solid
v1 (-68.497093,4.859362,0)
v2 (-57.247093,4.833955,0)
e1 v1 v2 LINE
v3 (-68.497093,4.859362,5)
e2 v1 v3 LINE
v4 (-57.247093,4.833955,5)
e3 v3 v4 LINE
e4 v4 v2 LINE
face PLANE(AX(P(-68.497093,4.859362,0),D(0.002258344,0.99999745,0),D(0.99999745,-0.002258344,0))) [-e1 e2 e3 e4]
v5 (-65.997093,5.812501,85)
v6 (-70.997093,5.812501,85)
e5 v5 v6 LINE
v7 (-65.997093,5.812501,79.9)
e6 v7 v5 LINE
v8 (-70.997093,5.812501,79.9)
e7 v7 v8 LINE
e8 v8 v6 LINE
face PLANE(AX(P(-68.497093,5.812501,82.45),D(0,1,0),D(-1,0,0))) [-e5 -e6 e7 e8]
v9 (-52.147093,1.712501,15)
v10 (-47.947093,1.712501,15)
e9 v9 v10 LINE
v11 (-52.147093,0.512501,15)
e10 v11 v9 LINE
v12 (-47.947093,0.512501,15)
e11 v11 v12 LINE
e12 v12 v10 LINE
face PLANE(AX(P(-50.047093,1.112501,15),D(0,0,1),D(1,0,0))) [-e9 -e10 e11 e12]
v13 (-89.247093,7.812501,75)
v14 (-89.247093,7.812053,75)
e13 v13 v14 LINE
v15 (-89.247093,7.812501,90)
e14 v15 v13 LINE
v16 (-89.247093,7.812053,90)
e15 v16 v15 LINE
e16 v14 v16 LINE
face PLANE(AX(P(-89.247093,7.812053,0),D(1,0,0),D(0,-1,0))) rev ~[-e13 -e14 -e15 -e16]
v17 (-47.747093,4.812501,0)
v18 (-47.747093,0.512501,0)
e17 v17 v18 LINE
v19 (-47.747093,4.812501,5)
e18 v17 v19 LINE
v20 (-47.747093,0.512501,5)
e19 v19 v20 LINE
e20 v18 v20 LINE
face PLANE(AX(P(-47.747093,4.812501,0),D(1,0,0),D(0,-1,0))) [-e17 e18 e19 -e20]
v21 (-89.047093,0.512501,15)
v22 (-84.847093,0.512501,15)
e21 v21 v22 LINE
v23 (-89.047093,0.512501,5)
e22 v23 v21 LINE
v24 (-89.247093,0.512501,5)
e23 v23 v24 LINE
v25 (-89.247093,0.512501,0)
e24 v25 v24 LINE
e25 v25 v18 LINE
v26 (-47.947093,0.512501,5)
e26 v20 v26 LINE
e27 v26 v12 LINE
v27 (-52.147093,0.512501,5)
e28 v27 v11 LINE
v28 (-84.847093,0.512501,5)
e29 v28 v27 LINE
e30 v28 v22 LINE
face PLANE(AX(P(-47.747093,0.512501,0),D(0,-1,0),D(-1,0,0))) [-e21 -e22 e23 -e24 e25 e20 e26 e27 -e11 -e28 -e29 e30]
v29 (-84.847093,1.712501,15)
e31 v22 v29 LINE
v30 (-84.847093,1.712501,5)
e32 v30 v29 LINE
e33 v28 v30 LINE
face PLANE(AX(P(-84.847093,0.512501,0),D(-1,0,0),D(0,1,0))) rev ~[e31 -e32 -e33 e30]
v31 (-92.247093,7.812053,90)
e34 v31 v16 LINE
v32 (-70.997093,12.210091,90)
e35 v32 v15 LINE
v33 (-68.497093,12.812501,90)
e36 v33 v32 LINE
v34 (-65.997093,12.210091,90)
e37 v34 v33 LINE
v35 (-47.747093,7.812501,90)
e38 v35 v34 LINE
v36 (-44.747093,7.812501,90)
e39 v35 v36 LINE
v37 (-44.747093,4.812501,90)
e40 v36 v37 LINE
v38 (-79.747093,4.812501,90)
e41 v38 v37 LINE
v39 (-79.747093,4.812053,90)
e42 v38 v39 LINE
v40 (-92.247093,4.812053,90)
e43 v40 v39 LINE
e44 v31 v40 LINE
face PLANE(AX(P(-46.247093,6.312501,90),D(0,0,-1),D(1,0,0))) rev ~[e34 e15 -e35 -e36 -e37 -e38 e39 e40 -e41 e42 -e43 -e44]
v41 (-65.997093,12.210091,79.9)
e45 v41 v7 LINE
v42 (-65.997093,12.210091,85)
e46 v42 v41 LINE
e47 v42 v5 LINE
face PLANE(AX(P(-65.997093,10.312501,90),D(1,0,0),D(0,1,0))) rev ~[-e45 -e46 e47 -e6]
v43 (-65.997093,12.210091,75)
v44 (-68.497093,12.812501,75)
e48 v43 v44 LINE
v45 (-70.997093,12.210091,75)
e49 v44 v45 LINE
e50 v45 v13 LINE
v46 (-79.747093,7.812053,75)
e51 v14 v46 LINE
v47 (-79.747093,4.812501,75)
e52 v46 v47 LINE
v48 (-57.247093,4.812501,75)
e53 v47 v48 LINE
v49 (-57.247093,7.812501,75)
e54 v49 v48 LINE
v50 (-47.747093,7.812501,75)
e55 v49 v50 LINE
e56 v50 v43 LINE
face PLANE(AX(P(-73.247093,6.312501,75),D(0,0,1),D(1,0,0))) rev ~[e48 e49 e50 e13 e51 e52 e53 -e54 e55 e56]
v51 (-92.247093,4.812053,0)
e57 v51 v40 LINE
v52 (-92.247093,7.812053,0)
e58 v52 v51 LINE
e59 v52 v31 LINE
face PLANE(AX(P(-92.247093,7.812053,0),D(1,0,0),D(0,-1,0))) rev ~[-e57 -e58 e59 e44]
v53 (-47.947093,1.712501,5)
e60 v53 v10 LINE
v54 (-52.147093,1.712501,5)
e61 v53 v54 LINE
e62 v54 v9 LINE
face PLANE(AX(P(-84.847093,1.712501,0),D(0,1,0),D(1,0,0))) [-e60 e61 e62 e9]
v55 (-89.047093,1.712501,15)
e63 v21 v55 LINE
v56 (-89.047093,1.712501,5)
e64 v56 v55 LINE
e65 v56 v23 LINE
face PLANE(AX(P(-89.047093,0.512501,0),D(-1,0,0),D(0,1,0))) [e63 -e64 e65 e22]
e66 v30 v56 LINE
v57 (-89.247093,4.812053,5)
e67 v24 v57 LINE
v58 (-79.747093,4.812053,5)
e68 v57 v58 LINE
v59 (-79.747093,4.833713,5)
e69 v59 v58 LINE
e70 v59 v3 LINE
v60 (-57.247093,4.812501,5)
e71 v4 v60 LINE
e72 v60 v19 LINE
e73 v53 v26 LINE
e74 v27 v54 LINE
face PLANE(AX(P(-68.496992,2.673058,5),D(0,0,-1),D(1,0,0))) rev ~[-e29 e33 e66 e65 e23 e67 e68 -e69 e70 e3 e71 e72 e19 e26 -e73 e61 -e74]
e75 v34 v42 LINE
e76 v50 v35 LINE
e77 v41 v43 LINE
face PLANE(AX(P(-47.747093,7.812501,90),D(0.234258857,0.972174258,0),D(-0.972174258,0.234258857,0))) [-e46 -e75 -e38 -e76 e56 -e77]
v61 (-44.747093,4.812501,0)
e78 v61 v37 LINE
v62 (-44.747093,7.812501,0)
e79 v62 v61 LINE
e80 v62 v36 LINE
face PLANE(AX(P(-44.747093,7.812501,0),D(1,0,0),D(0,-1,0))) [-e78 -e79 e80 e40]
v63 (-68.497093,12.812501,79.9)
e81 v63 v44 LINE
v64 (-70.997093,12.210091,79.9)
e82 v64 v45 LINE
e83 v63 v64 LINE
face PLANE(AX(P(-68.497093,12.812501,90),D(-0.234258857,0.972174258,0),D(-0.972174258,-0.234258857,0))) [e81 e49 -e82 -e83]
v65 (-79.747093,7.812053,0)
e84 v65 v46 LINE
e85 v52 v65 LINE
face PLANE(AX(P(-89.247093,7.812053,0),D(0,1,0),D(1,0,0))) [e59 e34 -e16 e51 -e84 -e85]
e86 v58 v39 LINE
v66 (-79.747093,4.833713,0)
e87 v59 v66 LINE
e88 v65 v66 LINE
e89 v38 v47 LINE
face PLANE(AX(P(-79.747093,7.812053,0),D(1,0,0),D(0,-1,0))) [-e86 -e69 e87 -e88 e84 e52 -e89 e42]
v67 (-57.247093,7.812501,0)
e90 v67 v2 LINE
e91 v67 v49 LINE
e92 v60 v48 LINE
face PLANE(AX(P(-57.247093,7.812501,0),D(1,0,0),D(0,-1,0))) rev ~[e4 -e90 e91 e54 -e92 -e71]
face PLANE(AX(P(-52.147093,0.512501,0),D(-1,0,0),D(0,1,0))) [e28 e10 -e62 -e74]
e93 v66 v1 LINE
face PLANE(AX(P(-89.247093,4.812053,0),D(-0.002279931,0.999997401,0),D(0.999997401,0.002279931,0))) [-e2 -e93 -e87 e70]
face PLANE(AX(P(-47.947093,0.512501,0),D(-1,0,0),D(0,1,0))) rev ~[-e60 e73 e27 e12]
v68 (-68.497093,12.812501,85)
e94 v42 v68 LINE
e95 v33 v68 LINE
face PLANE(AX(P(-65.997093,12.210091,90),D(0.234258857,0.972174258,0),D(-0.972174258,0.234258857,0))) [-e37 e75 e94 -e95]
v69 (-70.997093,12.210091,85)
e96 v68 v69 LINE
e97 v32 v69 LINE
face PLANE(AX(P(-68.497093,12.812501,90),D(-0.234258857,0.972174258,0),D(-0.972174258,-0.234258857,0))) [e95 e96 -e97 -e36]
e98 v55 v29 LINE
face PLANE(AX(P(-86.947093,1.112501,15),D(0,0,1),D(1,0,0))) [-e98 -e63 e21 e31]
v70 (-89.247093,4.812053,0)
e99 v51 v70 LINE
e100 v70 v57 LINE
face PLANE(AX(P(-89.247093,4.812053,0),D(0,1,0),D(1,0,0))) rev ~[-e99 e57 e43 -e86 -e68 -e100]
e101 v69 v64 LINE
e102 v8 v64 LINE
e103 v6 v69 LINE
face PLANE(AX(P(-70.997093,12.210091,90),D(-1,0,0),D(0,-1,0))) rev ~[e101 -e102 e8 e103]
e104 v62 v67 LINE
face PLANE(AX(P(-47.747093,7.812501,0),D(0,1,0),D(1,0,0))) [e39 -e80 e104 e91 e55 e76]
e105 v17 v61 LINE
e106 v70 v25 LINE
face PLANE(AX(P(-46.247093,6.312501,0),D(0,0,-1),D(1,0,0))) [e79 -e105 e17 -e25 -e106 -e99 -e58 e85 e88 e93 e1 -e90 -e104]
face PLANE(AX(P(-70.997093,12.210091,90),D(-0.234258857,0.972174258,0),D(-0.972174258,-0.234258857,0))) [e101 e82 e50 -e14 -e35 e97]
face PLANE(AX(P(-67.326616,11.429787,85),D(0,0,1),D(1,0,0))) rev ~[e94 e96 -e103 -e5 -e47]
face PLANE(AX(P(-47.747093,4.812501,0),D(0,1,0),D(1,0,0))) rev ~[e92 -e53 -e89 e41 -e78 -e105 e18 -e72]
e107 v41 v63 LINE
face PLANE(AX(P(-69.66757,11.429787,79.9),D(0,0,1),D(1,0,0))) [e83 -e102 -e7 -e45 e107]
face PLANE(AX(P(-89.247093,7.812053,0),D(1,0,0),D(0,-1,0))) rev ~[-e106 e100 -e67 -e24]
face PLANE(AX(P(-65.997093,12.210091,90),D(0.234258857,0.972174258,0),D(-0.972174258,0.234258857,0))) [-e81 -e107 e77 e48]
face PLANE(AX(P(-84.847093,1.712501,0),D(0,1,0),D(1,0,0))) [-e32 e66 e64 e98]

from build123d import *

# Parameters (mm, degrees)
F0_W      = 4.2
F0_H      = 1.2
F1_DEPTH  = 15
F0_W_2    = 32.7
F2_DEPTH  = 5
F4_DEPTH  = 5
F6_DEPTH  = 5
F7_W      = 9.5
F7_H      = 3
F8_DEPTH  = 90
F9_W      = 9.5
F9_H      = 3
F10_DEPTH = 15
F11_DEPTH = 10.1
F12_DEPTH = 5
F13_W     = 5
F13_H     = 5.1
F14_DEPTH = 4.5
F15_W     = 3
F15_H     = 3
F16_DEPTH = 90


with BuildPart() as f1:
    # F0 (on Top) → F1 (new body)
    with BuildSketch(Plane.XY):
        with Locations((-86.9470929563, 1.1125010281)):
            Rectangle(F0_W, F0_H)
    extrude(amount=F1_DEPTH)



with BuildPart() as f1b:
    # F0 (on Top) → F1, piece 2 (new body)
    with BuildSketch(Plane.XY):
        with Locations((-50.0470929563, 1.1125010281)):
            Rectangle(F0_W, F0_H)
    extrude(amount=F1_DEPTH)


with BuildPart() as f1_1:
    add(f1.part)

    add(f1b.part)  # F2 merges F1b
    # F0 (on Top) → F2 (join)
    with BuildSketch(Plane.XY):
        with Locations((-68.4970929563, 1.1125010281)):
            Rectangle(F0_W_2, F0_H)
    extrude(amount=F2_DEPTH)

    # F3 (on face) → F4 (join)
    with BuildSketch(Plane(origin=(0, 0, 0), x_dir=(1, 0, 0), z_dir=(0, 0, -1))):
        Polygon((-52.1470929563, -0.5125010281), (-84.8470929563, -0.5125010281), (-89.2470929563, -0.5125010281), (-89.2470929563, -4.8120530977), (-68.4970929563, -4.8593617954), (-47.7470929563, -4.8125010281), (-47.7470929563, -0.5125010281), align=None)
    extrude(amount=-F4_DEPTH)

    # F5: union 

    # F3 (on face) → F6 (join)
    with BuildSketch(Plane(origin=(0, 0, 0), x_dir=(1, 0, 0), z_dir=(0, 0, -1))):
        Polygon((-52.1470929563, -0.5125010281), (-84.8470929563, -0.5125010281), (-89.2470929563, -0.5125010281), (-89.2470929563, -4.8120530977), (-68.4970929563, -4.8593617954), (-47.7470929563, -4.8125010281), (-47.7470929563, -0.5125010281), align=None)
    extrude(amount=-F6_DEPTH)

    # F7 (on face) → F8 (join)
    with BuildSketch(Plane(origin=(0, 0, 0), x_dir=(1, 0, 0), z_dir=(0, 0, -1))):
        with Locations((-84.4970929563, -6.3120530977)):
            Rectangle(F7_W, F7_H)
        with Locations((-52.4970929563, -6.3125010281)):
            Rectangle(F7_W, F7_H)
    extrude(amount=-F8_DEPTH)

    # F9 (on face) → F10 (join)
    with BuildSketch(Plane.XY.offset(90)):
        Polygon((-89.2470929563, 4.8125010281), (-57.2470929563, 4.8125010281), (-57.2470929563, 7.8125010281), (-68.4970929563, 7.8125010281), (-89.2470929563, 7.8125010281), align=None)
        with Locations((-52.4970929563, 6.3125010281)):
            Rectangle(F9_W, F9_H)
        Polygon((-57.2470929563, 7.8125010281), (-47.7470929563, 7.8125010281), (-65.9970929563, 12.2100913895), (-65.9970929563, 10.3125010281), (-68.4970929563, 10.3125010281), (-68.4970929563, 7.8125010281), align=None)
        Polygon((-70.9970929563, 12.2100913895), (-89.2470929563, 7.8125010281), (-68.4970929563, 7.8125010281), (-68.4970929563, 10.3125010281), (-70.9970929563, 10.3125010281), align=None)
        Polygon((-68.4970929563, 10.3125010281), (-68.4970929563, 12.8125010281), (-70.9970929563, 12.2100913895), (-70.9970929563, 10.3125010281), align=None)
        Polygon((-65.9970929563, 10.3125010281), (-65.9970929563, 12.2100913895), (-68.4970929563, 12.8125010281), (-68.4970929563, 10.3125010281), align=None)
    extrude(amount=-F10_DEPTH)

    # F9 (on face) → F11 (cut)
    with BuildSketch(Plane.XY.offset(90)):
        Polygon((-68.4970929563, 10.3125010281), (-68.4970929563, 12.8125010281), (-70.9970929563, 12.2100913895), (-70.9970929563, 10.3125010281), align=None)
        Polygon((-65.9970929563, 10.3125010281), (-65.9970929563, 12.2100913895), (-68.4970929563, 12.8125010281), (-68.4970929563, 10.3125010281), align=None)
    extrude(amount=-F11_DEPTH, mode=Mode.SUBTRACT)

    # F9 (on face) → F12 (join)
    with BuildSketch(Plane.XY.offset(90)):
        Polygon((-65.9970929563, 10.3125010281), (-65.9970929563, 12.2100913895), (-68.4970929563, 12.8125010281), (-68.4970929563, 10.3125010281), align=None)
        Polygon((-68.4970929563, 10.3125010281), (-68.4970929563, 12.8125010281), (-70.9970929563, 12.2100913895), (-70.9970929563, 10.3125010281), align=None)
    extrude(amount=-F12_DEPTH)

    # F13 (on face) → F14 (cut)
    with BuildSketch(Plane(origin=(0, 10.3125010281, 0), x_dir=(-1, 0, 0), z_dir=(0, 1, 0))):
        with Locations((68.4970929563, 82.45)):
            Rectangle(F13_W, F13_H)
    extrude(amount=-F14_DEPTH, mode=Mode.SUBTRACT)

    # F15 (on face) → F16 (join)
    with BuildSketch(Plane(origin=(0, 0, 0), x_dir=(1, 0, 0), z_dir=(0, 0, -1))):
        with Locations((-46.2470929563, -6.3125010281)):
            Rectangle(F15_W, F15_H)
        with Locations((-90.7470929563, -6.3120530977)):
            Rectangle(F15_W, F15_H)
    extrude(amount=-F16_DEPTH)


solid = f1_1.part
